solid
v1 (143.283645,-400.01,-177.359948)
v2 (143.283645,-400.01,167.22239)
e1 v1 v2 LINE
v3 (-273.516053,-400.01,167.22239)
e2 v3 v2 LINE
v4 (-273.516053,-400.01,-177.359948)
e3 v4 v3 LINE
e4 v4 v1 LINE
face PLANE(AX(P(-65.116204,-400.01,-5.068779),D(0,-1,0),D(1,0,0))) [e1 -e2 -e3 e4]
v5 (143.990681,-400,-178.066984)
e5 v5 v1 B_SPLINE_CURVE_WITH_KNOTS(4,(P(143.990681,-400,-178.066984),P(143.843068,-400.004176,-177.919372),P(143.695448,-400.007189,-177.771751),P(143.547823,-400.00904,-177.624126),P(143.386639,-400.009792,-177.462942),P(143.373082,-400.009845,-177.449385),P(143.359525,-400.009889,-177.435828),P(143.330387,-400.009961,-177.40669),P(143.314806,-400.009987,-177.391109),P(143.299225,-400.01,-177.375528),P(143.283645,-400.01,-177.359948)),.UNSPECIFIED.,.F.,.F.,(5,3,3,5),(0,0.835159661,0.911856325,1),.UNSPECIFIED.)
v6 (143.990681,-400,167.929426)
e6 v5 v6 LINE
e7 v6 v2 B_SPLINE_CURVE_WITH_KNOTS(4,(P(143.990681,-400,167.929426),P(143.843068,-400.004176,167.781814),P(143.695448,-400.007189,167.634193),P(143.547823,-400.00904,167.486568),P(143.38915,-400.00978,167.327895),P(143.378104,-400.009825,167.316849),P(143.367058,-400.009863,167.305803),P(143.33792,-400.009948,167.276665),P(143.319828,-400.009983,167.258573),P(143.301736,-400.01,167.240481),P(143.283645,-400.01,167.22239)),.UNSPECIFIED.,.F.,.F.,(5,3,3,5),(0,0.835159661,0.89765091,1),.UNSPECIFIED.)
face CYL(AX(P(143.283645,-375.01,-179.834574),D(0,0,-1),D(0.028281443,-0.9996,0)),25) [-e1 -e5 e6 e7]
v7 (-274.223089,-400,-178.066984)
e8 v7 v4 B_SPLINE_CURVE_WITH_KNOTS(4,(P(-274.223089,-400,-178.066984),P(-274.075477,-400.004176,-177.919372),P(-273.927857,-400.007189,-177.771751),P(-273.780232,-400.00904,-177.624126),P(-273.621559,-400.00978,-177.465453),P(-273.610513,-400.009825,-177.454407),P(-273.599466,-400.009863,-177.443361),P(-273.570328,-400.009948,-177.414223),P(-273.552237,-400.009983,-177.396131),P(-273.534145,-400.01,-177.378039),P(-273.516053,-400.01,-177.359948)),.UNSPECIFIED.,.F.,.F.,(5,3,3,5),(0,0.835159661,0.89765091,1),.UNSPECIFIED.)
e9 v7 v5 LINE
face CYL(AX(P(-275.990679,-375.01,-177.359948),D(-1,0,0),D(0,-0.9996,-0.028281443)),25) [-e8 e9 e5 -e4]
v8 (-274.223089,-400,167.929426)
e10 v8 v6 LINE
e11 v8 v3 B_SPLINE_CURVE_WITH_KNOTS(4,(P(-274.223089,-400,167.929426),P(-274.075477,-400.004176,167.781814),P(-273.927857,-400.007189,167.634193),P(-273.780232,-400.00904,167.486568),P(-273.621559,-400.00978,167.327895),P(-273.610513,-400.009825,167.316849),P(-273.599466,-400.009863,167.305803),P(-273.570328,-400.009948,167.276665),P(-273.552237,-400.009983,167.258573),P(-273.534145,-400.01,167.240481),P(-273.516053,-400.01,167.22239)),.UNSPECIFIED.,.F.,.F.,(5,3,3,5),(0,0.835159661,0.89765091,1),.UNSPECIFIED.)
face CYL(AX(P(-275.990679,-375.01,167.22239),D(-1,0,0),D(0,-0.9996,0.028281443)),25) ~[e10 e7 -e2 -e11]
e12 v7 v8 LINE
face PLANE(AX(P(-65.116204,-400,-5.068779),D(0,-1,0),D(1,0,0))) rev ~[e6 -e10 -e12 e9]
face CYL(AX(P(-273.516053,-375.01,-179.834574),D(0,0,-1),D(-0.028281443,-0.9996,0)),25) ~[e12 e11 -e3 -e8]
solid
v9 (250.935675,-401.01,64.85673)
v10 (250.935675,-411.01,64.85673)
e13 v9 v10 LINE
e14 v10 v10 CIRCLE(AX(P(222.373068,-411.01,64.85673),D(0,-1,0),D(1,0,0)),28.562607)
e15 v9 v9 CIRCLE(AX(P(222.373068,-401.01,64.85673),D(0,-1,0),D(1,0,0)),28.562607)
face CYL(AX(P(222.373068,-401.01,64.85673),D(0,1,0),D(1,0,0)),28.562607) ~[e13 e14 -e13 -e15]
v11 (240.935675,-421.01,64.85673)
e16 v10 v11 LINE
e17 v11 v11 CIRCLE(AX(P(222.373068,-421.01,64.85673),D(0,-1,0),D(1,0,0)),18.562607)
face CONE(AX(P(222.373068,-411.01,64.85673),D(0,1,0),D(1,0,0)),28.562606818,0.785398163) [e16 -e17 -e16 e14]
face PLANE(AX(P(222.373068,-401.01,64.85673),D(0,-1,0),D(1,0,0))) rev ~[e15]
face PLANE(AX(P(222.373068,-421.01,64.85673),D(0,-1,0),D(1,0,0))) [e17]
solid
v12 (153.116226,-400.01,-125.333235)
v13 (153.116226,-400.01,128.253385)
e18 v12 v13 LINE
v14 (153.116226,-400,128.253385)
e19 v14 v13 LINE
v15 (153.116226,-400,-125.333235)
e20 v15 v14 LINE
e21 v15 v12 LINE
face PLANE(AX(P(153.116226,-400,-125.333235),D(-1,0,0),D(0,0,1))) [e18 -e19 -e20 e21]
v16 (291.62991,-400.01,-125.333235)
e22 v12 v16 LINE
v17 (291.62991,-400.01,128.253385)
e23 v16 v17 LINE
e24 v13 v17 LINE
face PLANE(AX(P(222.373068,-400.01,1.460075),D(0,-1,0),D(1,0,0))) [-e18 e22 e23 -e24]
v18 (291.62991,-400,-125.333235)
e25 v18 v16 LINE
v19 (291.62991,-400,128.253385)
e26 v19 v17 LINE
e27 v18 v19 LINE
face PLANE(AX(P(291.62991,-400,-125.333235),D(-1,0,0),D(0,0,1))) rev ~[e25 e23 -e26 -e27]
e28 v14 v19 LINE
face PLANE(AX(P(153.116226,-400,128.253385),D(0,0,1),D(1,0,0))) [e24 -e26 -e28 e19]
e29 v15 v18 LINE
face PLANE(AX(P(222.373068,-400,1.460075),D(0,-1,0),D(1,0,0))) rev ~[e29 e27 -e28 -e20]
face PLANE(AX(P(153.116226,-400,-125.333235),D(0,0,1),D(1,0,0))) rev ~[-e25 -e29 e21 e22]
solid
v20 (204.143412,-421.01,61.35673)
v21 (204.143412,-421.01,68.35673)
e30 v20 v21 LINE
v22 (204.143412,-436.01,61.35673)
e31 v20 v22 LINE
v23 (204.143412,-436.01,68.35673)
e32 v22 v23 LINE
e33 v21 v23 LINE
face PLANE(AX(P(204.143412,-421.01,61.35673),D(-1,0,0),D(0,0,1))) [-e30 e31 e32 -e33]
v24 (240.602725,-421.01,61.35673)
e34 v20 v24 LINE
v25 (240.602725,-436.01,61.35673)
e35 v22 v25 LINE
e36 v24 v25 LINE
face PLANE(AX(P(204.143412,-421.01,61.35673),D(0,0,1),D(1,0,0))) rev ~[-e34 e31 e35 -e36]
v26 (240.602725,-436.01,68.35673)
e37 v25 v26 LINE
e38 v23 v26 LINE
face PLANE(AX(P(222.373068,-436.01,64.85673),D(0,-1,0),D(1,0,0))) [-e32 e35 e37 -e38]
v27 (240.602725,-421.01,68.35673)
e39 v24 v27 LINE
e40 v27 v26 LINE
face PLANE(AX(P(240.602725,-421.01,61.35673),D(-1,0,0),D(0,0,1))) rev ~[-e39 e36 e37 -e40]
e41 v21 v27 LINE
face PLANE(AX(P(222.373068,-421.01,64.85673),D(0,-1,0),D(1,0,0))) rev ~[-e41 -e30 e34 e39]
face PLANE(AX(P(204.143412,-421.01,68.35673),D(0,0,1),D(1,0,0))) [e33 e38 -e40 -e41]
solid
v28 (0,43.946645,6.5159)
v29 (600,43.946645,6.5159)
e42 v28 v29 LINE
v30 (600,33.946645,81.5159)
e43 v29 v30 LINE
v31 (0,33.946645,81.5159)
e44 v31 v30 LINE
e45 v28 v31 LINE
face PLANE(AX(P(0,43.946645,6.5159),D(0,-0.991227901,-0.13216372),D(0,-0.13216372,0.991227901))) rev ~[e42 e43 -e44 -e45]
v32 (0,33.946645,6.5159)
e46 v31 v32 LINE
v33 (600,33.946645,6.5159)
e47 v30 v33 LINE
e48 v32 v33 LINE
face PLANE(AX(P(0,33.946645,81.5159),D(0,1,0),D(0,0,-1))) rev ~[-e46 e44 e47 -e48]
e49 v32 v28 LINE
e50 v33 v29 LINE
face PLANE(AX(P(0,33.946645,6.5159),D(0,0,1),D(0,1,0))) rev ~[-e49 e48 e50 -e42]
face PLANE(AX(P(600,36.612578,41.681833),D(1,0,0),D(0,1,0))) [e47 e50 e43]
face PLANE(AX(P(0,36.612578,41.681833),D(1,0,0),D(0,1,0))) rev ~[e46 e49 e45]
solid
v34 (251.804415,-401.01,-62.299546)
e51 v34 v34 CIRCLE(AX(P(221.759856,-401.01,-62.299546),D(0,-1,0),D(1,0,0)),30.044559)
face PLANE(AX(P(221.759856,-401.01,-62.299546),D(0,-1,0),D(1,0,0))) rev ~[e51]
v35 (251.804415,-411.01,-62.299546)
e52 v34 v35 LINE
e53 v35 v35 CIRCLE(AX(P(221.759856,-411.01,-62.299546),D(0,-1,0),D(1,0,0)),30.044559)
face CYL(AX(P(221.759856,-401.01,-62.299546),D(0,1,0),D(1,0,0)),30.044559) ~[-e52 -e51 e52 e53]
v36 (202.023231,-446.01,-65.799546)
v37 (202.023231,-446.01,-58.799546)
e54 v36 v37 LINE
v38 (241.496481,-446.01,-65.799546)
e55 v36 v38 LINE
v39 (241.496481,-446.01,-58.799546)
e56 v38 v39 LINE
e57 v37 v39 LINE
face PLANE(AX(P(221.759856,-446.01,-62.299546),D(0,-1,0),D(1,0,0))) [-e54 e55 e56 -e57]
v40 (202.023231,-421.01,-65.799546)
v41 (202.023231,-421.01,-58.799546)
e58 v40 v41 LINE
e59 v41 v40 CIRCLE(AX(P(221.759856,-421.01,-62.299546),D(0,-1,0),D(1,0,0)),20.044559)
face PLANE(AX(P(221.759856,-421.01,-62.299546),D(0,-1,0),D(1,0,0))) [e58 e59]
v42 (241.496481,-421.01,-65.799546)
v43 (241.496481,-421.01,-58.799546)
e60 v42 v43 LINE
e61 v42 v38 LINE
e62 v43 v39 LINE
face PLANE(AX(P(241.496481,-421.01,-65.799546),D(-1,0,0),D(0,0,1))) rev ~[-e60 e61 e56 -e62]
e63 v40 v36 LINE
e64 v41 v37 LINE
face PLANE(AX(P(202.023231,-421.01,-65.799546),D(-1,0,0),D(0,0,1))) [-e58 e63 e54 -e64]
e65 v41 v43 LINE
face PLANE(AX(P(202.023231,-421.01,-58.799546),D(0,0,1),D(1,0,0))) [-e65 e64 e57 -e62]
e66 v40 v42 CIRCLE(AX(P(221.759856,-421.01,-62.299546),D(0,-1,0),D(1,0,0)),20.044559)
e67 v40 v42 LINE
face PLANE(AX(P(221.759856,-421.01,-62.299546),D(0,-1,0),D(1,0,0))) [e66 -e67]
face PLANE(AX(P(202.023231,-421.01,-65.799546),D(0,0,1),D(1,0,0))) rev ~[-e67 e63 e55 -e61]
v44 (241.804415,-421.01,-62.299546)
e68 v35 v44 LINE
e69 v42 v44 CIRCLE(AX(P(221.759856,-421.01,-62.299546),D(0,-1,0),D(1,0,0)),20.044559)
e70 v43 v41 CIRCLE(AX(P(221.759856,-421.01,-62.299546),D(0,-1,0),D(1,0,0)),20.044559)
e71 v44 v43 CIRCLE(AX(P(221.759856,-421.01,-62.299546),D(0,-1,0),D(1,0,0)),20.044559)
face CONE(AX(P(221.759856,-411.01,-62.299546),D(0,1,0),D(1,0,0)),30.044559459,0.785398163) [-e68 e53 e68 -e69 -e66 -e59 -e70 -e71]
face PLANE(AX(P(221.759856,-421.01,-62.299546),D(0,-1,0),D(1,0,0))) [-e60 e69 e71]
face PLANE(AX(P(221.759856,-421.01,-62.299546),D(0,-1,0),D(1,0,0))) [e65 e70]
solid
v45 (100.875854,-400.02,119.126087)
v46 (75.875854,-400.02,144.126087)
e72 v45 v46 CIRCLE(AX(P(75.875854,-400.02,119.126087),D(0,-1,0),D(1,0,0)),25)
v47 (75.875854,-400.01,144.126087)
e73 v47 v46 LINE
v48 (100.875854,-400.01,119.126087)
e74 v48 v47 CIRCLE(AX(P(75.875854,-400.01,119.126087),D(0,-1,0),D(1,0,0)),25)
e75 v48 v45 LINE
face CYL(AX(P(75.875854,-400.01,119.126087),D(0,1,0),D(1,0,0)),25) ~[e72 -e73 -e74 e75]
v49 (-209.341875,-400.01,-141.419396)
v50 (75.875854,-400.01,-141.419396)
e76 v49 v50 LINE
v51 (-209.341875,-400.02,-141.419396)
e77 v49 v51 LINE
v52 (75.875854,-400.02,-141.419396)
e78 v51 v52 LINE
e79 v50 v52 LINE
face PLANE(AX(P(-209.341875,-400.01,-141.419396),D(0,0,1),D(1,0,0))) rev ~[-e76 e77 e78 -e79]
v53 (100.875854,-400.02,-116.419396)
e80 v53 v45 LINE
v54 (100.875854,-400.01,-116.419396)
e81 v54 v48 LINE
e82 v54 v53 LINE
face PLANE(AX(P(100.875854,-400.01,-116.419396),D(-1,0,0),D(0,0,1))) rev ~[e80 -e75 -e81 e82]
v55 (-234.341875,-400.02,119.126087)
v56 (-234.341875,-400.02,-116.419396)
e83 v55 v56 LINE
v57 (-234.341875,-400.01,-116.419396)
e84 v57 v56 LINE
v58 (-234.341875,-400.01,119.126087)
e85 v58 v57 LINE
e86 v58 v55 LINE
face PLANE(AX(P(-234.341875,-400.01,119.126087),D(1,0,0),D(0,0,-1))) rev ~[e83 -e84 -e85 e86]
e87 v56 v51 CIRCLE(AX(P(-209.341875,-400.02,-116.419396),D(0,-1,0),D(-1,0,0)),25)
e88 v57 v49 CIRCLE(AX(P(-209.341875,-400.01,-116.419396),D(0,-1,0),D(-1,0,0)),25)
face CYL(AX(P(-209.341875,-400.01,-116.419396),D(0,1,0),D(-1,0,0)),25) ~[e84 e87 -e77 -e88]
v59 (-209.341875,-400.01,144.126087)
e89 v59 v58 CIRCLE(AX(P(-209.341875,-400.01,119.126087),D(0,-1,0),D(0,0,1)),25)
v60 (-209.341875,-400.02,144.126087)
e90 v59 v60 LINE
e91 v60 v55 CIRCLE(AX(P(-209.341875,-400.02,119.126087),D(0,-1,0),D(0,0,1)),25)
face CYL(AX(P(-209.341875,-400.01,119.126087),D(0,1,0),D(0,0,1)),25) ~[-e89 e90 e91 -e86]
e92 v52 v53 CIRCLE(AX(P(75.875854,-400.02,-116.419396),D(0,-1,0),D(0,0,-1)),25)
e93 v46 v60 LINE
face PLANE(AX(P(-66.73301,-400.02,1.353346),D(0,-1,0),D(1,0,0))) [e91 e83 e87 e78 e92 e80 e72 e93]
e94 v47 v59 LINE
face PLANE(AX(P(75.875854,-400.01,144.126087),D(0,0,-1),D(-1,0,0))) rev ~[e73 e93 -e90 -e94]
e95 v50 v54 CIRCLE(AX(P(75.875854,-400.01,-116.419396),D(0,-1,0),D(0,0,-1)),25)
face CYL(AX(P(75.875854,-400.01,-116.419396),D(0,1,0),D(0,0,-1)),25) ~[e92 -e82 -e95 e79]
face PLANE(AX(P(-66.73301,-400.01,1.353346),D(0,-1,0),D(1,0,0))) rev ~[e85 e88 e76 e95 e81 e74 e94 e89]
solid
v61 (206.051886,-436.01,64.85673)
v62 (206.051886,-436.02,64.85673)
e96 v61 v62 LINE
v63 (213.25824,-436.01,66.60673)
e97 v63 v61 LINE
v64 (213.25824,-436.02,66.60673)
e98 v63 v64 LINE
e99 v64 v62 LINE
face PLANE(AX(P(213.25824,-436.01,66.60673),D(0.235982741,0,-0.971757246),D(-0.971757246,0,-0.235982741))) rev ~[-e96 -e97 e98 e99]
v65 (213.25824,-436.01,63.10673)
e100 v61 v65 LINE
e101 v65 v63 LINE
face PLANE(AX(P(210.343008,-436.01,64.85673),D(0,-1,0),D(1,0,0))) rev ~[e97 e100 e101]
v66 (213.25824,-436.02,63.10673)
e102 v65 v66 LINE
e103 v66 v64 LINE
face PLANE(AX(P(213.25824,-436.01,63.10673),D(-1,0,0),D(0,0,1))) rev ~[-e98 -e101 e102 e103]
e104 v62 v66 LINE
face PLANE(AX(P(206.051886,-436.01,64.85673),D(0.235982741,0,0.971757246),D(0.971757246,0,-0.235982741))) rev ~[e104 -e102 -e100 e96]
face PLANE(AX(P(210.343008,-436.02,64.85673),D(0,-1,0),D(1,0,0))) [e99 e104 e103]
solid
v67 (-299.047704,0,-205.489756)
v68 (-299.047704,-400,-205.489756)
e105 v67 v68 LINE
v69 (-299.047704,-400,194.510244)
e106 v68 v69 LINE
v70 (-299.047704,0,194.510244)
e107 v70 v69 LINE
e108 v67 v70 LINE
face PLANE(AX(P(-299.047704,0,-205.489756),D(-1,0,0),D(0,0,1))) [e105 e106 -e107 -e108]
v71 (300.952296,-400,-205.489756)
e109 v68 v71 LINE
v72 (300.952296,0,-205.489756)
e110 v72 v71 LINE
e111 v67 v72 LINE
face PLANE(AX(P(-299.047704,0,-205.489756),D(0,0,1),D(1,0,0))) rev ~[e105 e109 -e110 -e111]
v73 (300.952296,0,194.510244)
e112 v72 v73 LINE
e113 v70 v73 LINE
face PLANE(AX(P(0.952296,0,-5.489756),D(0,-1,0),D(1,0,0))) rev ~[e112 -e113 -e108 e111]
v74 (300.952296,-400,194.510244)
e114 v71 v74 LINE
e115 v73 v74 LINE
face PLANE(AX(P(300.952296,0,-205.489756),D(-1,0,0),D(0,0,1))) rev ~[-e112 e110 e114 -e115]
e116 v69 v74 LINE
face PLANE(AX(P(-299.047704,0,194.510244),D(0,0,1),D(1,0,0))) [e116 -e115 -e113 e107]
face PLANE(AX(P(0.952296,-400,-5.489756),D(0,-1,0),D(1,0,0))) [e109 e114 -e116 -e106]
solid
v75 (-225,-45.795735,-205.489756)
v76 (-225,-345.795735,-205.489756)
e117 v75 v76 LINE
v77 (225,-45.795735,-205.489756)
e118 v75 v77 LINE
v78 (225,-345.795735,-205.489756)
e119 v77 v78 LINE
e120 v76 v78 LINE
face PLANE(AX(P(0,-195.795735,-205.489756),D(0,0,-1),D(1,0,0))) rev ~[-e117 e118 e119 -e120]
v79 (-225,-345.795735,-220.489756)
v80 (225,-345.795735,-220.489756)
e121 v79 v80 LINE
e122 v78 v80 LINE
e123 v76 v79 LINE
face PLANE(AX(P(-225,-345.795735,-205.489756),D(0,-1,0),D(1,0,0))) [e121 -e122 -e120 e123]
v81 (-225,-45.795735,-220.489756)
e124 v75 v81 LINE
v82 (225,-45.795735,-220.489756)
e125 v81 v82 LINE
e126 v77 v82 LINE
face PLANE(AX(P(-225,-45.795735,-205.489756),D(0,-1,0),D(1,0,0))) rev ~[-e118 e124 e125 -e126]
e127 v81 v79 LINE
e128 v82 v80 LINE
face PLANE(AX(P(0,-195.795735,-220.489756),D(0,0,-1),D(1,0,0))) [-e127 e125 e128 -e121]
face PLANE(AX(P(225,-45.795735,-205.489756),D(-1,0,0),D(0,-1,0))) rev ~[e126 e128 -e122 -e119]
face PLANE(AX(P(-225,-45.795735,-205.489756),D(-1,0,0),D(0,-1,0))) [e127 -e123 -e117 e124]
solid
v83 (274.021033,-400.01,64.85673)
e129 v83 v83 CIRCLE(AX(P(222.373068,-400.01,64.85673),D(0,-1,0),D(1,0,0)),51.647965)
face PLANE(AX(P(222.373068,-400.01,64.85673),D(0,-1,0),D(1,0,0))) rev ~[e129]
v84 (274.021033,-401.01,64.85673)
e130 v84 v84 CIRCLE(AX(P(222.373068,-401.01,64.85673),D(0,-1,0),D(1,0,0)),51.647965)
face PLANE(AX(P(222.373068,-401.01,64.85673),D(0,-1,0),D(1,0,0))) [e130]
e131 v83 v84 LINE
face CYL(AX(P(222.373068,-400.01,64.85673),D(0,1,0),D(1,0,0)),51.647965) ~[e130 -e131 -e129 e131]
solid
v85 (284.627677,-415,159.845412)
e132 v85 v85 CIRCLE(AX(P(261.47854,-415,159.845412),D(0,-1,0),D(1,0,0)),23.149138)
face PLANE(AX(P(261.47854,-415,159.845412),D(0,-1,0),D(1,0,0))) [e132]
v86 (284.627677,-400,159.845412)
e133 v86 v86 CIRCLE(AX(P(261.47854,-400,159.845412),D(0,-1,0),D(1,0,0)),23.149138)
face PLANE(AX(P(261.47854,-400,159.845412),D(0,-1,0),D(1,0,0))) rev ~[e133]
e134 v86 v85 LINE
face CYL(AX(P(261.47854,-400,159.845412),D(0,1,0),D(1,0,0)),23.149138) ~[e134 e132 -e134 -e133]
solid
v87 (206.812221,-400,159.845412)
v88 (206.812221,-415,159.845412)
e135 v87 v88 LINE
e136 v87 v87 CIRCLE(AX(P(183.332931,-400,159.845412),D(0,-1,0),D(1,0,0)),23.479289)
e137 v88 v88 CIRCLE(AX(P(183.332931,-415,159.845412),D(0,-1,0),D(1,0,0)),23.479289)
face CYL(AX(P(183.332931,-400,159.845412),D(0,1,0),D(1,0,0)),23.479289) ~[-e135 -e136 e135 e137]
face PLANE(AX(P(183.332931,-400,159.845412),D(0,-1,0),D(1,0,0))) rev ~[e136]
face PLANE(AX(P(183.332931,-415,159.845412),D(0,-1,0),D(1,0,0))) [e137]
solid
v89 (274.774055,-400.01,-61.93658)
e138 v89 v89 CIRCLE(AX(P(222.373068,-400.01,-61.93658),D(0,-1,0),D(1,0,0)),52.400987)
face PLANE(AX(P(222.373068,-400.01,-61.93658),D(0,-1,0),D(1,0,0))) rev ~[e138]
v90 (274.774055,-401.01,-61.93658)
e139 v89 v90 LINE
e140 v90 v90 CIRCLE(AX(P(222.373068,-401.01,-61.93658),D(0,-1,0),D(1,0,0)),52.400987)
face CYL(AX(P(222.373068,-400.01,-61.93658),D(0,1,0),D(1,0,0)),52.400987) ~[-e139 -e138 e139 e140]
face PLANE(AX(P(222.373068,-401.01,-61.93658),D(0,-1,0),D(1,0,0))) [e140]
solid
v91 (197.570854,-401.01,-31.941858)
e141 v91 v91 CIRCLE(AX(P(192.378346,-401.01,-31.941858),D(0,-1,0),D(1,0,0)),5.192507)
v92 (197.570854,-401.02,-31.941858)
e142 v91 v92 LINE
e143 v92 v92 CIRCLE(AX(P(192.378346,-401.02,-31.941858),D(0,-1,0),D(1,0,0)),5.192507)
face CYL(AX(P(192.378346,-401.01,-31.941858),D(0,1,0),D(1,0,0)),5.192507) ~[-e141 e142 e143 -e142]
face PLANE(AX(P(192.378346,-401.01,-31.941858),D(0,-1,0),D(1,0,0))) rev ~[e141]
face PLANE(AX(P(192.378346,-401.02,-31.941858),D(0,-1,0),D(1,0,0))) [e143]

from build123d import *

# Parameters (mm, degrees)
F0_W        = 600
F0_H        = 400
F1_DEPTH    = 400
F3_W        = 418.2137697935
F3_H        = 345.9964096546
F4_DEPTH    = 0.01
F5_T1_DEPTH = 349.5315899895
F5_T3_DEPTH = 421.7489501284
F7_DEPTH    = 0.01
F8_R        = 23.4792892743
F9_DEPTH    = 15
F8_R_2      = 23.149137583
F10_W       = 138.5136842728
F10_H       = 253.5866200924
F11_DEPTH   = 0.01
F12_R       = 51.6479650584
F13_DEPTH   = 1
F12_R_2     = 52.4009870451
F14_R       = 28.5626068182
F15_DEPTH   = 20
F14_R_2     = 30.0445594594
F16_SIZE    = 10
F16_2_SIZE  = 10
F17_W       = 36.4593127685
F17_H       = 7
F18_DEPTH   = 15
F19_W       = 39.4732498749
F19_H       = 7
F20_DEPTH   = 25
F21_W       = 450
F21_H       = 300
F22_DEPTH   = 15
F23_R       = 5.1925071587
F24_DEPTH   = 0.01
F26_DEPTH   = 0.01
F28_DEPTH   = 600


# Not quite as in the source:
# - a fillet or chamfer that OpenCascade refuses, or shapes differently, is made with other operations: its cross-section is extruded or revolved along the edge and cut away or added
# - a feature names something its author has since deleted; it is built from what else it names


with BuildPart() as f1:
    # F0 (on Front) → F1 (new body)
    with BuildSketch(Plane.XZ):
        with Locations((0.952295959, -5.4897558531)):
            Rectangle(F0_W, F0_H)
    extrude(amount=F1_DEPTH)


with BuildPart() as f4:
    # F3 (on face) → F4 (new body)
    with BuildSketch(Plane.XZ.offset(400)):
        with Locations((-65.1162043214, -5.0687789917)):
            Rectangle(F3_W, F3_H)
    extrude(amount=F4_DEPTH)

    # F5: fillet of radius 25 on 4 edges, made by hand

    # F5_s2 → F5_t1 (cut)
    with BuildSketch(Plane.XY.offset(-179.8345739864)):
        with BuildLine():
            ThreePointArc((143.9906805754, -400), (143.637197899, -400.007499875), (143.2836445084, -400.01))
            Line((143.2836445084, -400.01), (143.9906805754, -400.01))
            Line((143.9906805754, -400.01), (143.9906805754, -400))
        make_face()
        with BuildLine():
            ThreePointArc((-274.2230892181, -400), (-273.8696065418, -400.007499875), (-273.5160531512, -400.01))
            Line((-273.5160531512, -400.01), (-274.2230892181, -400.01))
            Line((-274.2230892181, -400.01), (-274.2230892181, -400))
        make_face()
    extrude(amount=F5_T1_DEPTH, mode=Mode.SUBTRACT)

    # F5_s4 → F5_t3 (cut)
    with BuildSketch(Plane.YZ.offset(-275.9906793856)):
        with BuildLine():
            ThreePointArc((-400, 167.9294258356), (-400.007499875, 167.5759431592), (-400.01, 167.2223897686))
            Line((-400.01, 167.2223897686), (-400.01, 167.9294258356))
            Line((-400.01, 167.9294258356), (-400, 167.9294258356))
        make_face()
        with BuildLine():
            ThreePointArc((-400, -178.066983819), (-400.007499875, -177.7135011426), (-400.01, -177.359947752))
            Line((-400.01, -177.359947752), (-400.01, -178.066983819))
            Line((-400.01, -178.066983819), (-400, -178.066983819))
        make_face()
    extrude(amount=F5_T3_DEPTH, mode=Mode.SUBTRACT)


with BuildPart() as f7:
    # F6 (on face) → F7 (new body)
    with BuildSketch(Plane.XZ.offset(400.01)):
        with BuildLine():
            Line((75.8758544922, 144.1260868311), (-209.3418747187, 144.1260868311))
            ThreePointArc((-209.3418747187, 144.1260868311), (-227.0195442483, 136.8037563608), (-234.3418747187, 119.1260868311))
            Line((-234.3418747187, 119.1260868311), (-234.3418747187, -116.4193958044))
            ThreePointArc((-234.3418747187, -116.4193958044), (-227.0195442483, -134.0970653341), (-209.3418747187, -141.4193958044))
            Line((-209.3418747187, -141.4193958044), (75.8758544922, -141.4193958044))
            ThreePointArc((75.8758544922, -141.4193958044), (93.5535240219, -134.0970653341), (100.8758544922, -116.4193958044))
            Line((100.8758544922, -116.4193958044), (100.8758544922, 119.1260868311))
            ThreePointArc((100.8758544922, 119.1260868311), (93.5535240219, 136.8037563608), (75.8758544922, 144.1260868311))
        make_face()
    extrude(amount=F7_DEPTH)


with BuildPart() as f9:
    # F8 (on face) → F9 (new body)
    with BuildSketch(Plane.XZ.offset(400)):
        with Locations((183.3329312503, 159.8454117775)):
            Circle(F8_R)
    extrude(amount=F9_DEPTH)


with BuildPart() as f9b:
    # F8 (on face) → F9, piece 2 (new body)
    with BuildSketch(Plane.XZ.offset(400)):
        with Locations((261.4785395563, 159.8454117775)):
            Circle(F8_R_2)
    extrude(amount=F9_DEPTH)


with BuildPart() as f11:
    # F10 (on face) → F11 (new body)
    with BuildSketch(Plane.XZ.offset(400)):
        with Locations((222.3730683327, 1.4600753784)):
            Rectangle(F10_W, F10_H)
    extrude(amount=F11_DEPTH)


with BuildPart() as f13:
    # F12 (on face) → F13 (new body)
    with BuildSketch(Plane.XZ.offset(400.01)):
        with Locations((222.3730683327, 64.8567304015)):
            Circle(F12_R)
    extrude(amount=F13_DEPTH)


with BuildPart() as f13b:
    # F12 (on face) → F13, piece 2 (new body)
    with BuildSketch(Plane.XZ.offset(400.01)):
        with Locations((222.3730683327, -61.9365796447)):
            Circle(F12_R_2)
    extrude(amount=F13_DEPTH)


with BuildPart() as f15:
    # F14 (on face) → F15 (new body)
    with BuildSketch(Plane.XZ.offset(401.01)):
        with Locations((222.3730683327, 64.8567304015)):
            Circle(F14_R)
    extrude(amount=F15_DEPTH)

    # F16
    f16_edges = [f15.edges().sort_by_distance(p)[0] for p in [
        (193.810462, -421.01, 64.85673),
    ]]
    chamfer(f16_edges, length=F16_SIZE)


with BuildPart() as f15b:
    # F14 (on face) → F15, piece 2 (new body)
    with BuildSketch(Plane.XZ.offset(401.01)):
        with Locations((221.7598557472, -62.2995458543)):
            Circle(F14_R_2)
    extrude(amount=F15_DEPTH)

    # F16#2
    f16_2_edges = [f15b.edges().sort_by_distance(p)[0] for p in [
        (191.715296, -421.01, -62.299546),
    ]]
    chamfer(f16_2_edges, length=F16_2_SIZE)

    # F19 (on face) → F20 (join)
    with BuildSketch(Plane.XZ.offset(421.01)):
        with Locations((221.7598557472, -62.2995458543)):
            Rectangle(F19_W, F19_H)
    extrude(amount=F20_DEPTH)


with BuildPart() as f18:
    # F17 (on face) → F18 (new body)
    with BuildSketch(Plane.XZ.offset(421.01)):
        with Locations((222.3730683327, 64.8567304015)):
            Rectangle(F17_W, F17_H)
    extrude(amount=F18_DEPTH)


with BuildPart() as f22:
    # F21 (on face) → F22 (new body)
    with BuildSketch(Plane(origin=(0, 0, -205.4897558531), x_dir=(1, 0, 0), z_dir=(0, 0, -1))):
        with Locations((0, 195.795734788)):
            Rectangle(F21_W, F21_H)
    extrude(amount=F22_DEPTH)


with BuildPart() as f24:
    # F23 (on face) → F24 (new body)
    with BuildSketch(Plane.XZ.offset(401.01)):
        with Locations((192.378346444, -31.941857756)):
            Circle(F23_R)
    extrude(amount=F24_DEPTH)


with BuildPart() as f26:
    # F25 (on face) → F26 (new body)
    with BuildSketch(Plane.XZ.offset(436.01)):
        Polygon((213.2582401405, 63.1067304015), (213.2582401405, 66.6067304015), (206.0518860817, 64.8567304015), align=None)
    extrude(amount=F26_DEPTH)


with BuildPart() as f28:
    # F27 (on Right) → F28 (new body)
    with BuildSketch(Plane.YZ):
        Polygon((43.9466453344, 6.5159001984), (33.9466453344, 81.5159001984), (33.9466453344, 6.5159001984), align=None)
    extrude(amount=F28_DEPTH)


solid = Compound([f1.part, f4.part, f7.part, f9.part, f9b.part, f11.part, f13.part, f13b.part, f15.part, f15b.part, f18.part, f22.part, f24.part, f26.part, f28.part])
